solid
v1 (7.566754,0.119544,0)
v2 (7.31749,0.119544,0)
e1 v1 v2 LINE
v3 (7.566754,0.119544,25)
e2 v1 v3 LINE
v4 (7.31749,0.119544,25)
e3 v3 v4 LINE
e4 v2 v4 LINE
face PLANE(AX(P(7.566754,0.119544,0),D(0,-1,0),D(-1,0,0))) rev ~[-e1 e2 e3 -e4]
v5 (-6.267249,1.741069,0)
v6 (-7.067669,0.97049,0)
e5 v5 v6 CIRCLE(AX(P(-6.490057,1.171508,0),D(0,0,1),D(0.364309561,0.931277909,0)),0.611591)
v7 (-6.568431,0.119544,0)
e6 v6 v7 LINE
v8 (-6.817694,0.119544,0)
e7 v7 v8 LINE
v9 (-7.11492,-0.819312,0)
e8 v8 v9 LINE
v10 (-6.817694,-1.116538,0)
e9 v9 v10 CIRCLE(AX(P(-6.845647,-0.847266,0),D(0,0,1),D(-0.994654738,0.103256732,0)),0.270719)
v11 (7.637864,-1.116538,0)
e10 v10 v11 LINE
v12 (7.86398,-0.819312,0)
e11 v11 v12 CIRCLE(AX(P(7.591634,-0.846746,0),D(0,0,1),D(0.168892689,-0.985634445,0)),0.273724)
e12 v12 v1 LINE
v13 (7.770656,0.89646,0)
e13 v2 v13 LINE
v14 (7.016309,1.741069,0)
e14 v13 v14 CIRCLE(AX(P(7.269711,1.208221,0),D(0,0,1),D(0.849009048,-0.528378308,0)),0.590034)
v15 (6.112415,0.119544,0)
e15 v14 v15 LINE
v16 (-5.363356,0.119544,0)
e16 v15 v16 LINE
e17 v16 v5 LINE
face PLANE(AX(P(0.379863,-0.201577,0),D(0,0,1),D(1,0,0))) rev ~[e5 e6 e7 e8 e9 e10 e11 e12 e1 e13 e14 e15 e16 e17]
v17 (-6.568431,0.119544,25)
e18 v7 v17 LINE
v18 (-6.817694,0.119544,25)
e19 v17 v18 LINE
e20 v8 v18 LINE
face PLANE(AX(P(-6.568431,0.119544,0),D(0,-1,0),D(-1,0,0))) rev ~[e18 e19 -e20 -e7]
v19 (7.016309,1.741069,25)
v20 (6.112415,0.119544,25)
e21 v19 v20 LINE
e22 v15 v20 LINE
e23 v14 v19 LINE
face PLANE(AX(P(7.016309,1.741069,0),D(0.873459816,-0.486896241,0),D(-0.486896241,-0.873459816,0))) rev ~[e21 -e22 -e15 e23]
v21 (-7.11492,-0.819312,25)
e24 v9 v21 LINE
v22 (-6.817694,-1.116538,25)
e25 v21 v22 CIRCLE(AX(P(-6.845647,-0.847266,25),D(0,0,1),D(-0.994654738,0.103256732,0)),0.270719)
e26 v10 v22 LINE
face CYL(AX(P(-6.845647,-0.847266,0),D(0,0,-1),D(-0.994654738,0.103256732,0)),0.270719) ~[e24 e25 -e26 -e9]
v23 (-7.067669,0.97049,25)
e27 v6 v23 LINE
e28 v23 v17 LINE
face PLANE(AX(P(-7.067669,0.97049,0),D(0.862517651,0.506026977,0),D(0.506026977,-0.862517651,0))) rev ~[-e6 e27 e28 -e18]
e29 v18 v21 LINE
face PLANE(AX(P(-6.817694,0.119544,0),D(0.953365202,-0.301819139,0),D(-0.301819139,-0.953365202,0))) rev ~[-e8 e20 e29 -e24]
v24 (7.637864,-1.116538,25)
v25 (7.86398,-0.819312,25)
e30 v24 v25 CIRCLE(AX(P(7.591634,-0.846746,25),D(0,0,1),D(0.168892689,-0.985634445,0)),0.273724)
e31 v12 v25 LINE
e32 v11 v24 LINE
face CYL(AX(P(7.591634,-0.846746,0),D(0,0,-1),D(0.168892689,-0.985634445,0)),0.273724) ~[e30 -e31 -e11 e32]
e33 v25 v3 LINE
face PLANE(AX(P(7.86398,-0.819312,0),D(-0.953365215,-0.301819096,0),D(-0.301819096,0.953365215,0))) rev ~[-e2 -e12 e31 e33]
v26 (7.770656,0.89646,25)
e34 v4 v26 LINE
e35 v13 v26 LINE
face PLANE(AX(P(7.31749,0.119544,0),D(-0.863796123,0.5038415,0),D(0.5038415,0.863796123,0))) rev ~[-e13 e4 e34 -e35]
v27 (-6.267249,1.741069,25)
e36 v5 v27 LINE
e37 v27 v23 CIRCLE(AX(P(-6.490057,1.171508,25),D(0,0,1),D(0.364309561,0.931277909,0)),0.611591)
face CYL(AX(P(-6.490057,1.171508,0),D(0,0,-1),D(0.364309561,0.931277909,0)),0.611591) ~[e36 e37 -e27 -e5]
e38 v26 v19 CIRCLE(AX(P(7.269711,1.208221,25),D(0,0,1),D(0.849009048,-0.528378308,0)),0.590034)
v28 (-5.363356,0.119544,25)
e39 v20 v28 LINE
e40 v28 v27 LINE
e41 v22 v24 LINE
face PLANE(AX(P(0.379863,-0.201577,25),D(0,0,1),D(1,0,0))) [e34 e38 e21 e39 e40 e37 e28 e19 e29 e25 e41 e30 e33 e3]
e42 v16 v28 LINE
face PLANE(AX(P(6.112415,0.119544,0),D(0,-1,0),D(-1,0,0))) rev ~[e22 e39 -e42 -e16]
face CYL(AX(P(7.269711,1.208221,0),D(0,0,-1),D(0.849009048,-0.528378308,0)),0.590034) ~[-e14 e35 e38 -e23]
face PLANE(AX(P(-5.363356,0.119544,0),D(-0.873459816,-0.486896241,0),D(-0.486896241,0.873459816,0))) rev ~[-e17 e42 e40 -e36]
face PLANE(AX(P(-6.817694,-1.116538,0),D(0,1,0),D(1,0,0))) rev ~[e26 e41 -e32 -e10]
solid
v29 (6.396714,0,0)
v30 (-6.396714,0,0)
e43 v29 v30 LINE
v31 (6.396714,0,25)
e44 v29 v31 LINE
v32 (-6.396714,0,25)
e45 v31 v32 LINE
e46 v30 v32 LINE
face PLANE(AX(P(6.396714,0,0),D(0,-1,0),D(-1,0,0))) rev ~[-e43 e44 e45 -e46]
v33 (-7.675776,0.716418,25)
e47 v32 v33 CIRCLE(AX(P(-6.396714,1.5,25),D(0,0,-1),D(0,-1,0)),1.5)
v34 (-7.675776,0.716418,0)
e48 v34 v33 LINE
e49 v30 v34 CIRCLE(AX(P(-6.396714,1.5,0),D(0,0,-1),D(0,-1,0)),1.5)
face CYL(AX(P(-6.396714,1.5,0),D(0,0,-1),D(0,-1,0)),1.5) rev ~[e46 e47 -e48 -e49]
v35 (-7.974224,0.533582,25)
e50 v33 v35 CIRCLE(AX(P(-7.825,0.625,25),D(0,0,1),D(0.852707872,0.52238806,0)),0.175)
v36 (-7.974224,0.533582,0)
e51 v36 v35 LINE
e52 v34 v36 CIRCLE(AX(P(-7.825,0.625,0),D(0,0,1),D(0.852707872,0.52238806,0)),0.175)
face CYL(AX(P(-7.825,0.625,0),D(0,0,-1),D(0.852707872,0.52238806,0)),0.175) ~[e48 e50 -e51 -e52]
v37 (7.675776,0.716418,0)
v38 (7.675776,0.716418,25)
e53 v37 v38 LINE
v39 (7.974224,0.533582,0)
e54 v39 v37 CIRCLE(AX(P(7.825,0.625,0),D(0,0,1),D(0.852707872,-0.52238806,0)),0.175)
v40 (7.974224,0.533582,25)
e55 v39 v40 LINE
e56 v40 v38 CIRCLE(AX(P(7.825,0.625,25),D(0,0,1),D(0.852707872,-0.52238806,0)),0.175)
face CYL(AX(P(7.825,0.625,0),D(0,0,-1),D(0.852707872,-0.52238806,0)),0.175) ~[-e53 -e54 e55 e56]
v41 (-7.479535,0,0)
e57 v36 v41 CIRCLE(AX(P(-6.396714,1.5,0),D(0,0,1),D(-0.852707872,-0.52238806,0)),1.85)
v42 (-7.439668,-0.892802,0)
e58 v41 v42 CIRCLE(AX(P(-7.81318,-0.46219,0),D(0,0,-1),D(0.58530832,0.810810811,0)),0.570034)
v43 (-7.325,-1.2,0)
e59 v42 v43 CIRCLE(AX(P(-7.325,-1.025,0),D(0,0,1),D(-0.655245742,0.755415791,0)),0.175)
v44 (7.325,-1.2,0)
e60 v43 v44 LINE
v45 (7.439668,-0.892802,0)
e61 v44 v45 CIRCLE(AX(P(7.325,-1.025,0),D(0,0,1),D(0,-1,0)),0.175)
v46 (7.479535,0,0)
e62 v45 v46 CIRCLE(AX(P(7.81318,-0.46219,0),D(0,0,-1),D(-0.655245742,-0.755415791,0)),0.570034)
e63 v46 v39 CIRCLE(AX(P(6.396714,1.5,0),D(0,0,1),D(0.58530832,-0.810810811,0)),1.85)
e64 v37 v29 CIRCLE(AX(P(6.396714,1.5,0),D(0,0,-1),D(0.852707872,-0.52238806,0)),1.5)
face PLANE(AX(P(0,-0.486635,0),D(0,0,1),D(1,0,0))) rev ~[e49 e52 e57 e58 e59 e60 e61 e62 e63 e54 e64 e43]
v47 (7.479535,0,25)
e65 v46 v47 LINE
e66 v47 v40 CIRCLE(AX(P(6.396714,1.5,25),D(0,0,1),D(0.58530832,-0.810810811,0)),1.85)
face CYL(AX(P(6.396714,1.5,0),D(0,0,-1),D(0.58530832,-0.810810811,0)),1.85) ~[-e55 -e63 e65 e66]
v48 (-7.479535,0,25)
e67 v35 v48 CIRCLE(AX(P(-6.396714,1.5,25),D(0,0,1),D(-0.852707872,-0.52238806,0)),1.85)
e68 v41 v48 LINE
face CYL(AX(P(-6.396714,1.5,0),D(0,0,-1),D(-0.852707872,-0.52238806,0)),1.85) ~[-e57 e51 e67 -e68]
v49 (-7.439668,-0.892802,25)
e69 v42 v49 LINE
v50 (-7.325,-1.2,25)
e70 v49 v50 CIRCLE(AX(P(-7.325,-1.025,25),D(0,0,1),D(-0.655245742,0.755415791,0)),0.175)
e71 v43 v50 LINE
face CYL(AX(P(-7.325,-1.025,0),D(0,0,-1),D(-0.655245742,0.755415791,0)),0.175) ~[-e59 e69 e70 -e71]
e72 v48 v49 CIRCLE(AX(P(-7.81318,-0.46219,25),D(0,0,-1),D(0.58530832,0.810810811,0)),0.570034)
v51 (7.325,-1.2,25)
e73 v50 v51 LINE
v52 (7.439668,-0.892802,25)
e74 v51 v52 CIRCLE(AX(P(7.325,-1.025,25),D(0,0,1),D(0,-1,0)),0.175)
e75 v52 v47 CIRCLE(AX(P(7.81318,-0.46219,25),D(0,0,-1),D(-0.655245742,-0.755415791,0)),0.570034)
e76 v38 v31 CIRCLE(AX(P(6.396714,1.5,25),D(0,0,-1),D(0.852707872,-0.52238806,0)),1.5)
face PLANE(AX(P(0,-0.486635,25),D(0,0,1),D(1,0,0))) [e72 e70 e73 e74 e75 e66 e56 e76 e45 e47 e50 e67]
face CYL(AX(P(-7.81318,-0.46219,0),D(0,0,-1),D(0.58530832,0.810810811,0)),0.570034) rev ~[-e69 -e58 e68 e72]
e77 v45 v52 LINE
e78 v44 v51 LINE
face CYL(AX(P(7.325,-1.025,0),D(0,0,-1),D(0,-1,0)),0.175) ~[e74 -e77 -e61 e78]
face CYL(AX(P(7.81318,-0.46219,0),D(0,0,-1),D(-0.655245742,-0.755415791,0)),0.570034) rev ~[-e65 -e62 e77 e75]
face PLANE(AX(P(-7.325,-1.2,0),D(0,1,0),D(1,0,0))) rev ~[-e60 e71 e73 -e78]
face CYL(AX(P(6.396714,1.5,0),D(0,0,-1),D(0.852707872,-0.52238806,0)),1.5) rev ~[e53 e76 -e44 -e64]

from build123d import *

# Parameters (mm, degrees)
F1_DEPTH = 250
F2_SCALE = 0.1
F4_DEPTH = 25


# Not quite as in the source:
# - ends of sketch curves that miss each other by under 0.0002 mm in the source are joined


with BuildPart() as f1:
    # F0 (on Top) → F1 (new body)
    with BuildSketch(Plane.XY):
        with BuildLine():
            Line((-53.633557, 1.195441), (-62.6724906028, 17.4106930814))
            ThreePointArc((-62.6724906028, 17.4106930814), (-69.142266545, 16.1210302987), (-70.6766850708, 9.7048951206))
            Line((-70.6766850708, 9.7048951206), (-65.684308, 1.195441))
            Line((-65.684308, 1.195441), (-68.17694, 1.195441))
            Line((-68.17694, 1.195441), (-71.1491983328, -8.1931208927))
            ThreePointArc((-71.1491983328, -8.1931208927), (-70.3707522269, -10.3869306581), (-68.1769443193, -11.165382))
            Line((-68.1769443193, -11.165382), (76.3786361624, -11.165382))
            ThreePointArc((76.3786361624, -11.165382), (78.0948325124, -10.1247630324), (78.6397955471, -8.1931230456))
            Line((78.6397955471, -8.1931230456), (75.667537, 1.195441))
            Line((75.667537, 1.195441), (73.174905, 1.195441))
            Line((73.174905, 1.195441), (77.7065557459, 8.9645952796))
            ThreePointArc((77.7065557459, 8.9645952796), (77.0978016072, 16.0125981458), (70.1630878027, 17.41069344))
            Line((70.1630878027, 17.41069344), (61.124154, 1.195441))
            Line((61.124154, 1.195441), (-53.633557, 1.195441))
        make_face()
    extrude(amount=F1_DEPTH)


with BuildPart() as f1_1:
    # F2: moved
    add(f1.part.scale(F2_SCALE))


with BuildPart() as f4:
    # F3 (on Top) → F4 (new body)
    with BuildSketch(Plane.XY):
        with BuildLine():
            ThreePointArc((7.9742238776, 0.5335820896), (7.9164179104, 0.7742238776), (7.6757761224, 0.7164179104))
            ThreePointArc((7.6757761224, 0.7164179104), (7.1297309804, 0.1913034855), (6.3967143143, 0))
            Line((6.3967143143, 0), (0, 0))
            Line((0, 0), (-6.3967143143, 0))
            ThreePointArc((-6.3967143143, 0), (-7.1297309804, 0.1913034855), (-7.6757761224, 0.7164179104))
            ThreePointArc((-7.6757761224, 0.7164179104), (-7.9164179104, 0.7742238776), (-7.9742238776, 0.5335820896))
            ThreePointArc((-7.9742238776, 0.5335820896), (-7.7533706188, 0.2422306764), (-7.4795347057, 0))
            ThreePointArc((-7.4795347057, 0), (-7.2437138511, -0.4367609962), (-7.4396680049, -0.8928022366))
            ThreePointArc((-7.4396680049, -0.8928022366), (-7.4889506154, -1.0861980041), (-7.325, -1.2))
            Line((-7.325, -1.2), (0, -1.2))
            Line((0, -1.2), (7.325, -1.2))
            ThreePointArc((7.325, -1.2), (7.4889506154, -1.0861980041), (7.4396680049, -0.8928022366))
            ThreePointArc((7.4396680049, -0.8928022366), (7.2437138511, -0.4367609962), (7.4795347057, 0))
            ThreePointArc((7.4795347057, 0), (7.7533706188, 0.2422306764), (7.9742238776, 0.5335820896))
        make_face()
    extrude(amount=F4_DEPTH)


solid = Compound([f1_1.part, f4.part])
